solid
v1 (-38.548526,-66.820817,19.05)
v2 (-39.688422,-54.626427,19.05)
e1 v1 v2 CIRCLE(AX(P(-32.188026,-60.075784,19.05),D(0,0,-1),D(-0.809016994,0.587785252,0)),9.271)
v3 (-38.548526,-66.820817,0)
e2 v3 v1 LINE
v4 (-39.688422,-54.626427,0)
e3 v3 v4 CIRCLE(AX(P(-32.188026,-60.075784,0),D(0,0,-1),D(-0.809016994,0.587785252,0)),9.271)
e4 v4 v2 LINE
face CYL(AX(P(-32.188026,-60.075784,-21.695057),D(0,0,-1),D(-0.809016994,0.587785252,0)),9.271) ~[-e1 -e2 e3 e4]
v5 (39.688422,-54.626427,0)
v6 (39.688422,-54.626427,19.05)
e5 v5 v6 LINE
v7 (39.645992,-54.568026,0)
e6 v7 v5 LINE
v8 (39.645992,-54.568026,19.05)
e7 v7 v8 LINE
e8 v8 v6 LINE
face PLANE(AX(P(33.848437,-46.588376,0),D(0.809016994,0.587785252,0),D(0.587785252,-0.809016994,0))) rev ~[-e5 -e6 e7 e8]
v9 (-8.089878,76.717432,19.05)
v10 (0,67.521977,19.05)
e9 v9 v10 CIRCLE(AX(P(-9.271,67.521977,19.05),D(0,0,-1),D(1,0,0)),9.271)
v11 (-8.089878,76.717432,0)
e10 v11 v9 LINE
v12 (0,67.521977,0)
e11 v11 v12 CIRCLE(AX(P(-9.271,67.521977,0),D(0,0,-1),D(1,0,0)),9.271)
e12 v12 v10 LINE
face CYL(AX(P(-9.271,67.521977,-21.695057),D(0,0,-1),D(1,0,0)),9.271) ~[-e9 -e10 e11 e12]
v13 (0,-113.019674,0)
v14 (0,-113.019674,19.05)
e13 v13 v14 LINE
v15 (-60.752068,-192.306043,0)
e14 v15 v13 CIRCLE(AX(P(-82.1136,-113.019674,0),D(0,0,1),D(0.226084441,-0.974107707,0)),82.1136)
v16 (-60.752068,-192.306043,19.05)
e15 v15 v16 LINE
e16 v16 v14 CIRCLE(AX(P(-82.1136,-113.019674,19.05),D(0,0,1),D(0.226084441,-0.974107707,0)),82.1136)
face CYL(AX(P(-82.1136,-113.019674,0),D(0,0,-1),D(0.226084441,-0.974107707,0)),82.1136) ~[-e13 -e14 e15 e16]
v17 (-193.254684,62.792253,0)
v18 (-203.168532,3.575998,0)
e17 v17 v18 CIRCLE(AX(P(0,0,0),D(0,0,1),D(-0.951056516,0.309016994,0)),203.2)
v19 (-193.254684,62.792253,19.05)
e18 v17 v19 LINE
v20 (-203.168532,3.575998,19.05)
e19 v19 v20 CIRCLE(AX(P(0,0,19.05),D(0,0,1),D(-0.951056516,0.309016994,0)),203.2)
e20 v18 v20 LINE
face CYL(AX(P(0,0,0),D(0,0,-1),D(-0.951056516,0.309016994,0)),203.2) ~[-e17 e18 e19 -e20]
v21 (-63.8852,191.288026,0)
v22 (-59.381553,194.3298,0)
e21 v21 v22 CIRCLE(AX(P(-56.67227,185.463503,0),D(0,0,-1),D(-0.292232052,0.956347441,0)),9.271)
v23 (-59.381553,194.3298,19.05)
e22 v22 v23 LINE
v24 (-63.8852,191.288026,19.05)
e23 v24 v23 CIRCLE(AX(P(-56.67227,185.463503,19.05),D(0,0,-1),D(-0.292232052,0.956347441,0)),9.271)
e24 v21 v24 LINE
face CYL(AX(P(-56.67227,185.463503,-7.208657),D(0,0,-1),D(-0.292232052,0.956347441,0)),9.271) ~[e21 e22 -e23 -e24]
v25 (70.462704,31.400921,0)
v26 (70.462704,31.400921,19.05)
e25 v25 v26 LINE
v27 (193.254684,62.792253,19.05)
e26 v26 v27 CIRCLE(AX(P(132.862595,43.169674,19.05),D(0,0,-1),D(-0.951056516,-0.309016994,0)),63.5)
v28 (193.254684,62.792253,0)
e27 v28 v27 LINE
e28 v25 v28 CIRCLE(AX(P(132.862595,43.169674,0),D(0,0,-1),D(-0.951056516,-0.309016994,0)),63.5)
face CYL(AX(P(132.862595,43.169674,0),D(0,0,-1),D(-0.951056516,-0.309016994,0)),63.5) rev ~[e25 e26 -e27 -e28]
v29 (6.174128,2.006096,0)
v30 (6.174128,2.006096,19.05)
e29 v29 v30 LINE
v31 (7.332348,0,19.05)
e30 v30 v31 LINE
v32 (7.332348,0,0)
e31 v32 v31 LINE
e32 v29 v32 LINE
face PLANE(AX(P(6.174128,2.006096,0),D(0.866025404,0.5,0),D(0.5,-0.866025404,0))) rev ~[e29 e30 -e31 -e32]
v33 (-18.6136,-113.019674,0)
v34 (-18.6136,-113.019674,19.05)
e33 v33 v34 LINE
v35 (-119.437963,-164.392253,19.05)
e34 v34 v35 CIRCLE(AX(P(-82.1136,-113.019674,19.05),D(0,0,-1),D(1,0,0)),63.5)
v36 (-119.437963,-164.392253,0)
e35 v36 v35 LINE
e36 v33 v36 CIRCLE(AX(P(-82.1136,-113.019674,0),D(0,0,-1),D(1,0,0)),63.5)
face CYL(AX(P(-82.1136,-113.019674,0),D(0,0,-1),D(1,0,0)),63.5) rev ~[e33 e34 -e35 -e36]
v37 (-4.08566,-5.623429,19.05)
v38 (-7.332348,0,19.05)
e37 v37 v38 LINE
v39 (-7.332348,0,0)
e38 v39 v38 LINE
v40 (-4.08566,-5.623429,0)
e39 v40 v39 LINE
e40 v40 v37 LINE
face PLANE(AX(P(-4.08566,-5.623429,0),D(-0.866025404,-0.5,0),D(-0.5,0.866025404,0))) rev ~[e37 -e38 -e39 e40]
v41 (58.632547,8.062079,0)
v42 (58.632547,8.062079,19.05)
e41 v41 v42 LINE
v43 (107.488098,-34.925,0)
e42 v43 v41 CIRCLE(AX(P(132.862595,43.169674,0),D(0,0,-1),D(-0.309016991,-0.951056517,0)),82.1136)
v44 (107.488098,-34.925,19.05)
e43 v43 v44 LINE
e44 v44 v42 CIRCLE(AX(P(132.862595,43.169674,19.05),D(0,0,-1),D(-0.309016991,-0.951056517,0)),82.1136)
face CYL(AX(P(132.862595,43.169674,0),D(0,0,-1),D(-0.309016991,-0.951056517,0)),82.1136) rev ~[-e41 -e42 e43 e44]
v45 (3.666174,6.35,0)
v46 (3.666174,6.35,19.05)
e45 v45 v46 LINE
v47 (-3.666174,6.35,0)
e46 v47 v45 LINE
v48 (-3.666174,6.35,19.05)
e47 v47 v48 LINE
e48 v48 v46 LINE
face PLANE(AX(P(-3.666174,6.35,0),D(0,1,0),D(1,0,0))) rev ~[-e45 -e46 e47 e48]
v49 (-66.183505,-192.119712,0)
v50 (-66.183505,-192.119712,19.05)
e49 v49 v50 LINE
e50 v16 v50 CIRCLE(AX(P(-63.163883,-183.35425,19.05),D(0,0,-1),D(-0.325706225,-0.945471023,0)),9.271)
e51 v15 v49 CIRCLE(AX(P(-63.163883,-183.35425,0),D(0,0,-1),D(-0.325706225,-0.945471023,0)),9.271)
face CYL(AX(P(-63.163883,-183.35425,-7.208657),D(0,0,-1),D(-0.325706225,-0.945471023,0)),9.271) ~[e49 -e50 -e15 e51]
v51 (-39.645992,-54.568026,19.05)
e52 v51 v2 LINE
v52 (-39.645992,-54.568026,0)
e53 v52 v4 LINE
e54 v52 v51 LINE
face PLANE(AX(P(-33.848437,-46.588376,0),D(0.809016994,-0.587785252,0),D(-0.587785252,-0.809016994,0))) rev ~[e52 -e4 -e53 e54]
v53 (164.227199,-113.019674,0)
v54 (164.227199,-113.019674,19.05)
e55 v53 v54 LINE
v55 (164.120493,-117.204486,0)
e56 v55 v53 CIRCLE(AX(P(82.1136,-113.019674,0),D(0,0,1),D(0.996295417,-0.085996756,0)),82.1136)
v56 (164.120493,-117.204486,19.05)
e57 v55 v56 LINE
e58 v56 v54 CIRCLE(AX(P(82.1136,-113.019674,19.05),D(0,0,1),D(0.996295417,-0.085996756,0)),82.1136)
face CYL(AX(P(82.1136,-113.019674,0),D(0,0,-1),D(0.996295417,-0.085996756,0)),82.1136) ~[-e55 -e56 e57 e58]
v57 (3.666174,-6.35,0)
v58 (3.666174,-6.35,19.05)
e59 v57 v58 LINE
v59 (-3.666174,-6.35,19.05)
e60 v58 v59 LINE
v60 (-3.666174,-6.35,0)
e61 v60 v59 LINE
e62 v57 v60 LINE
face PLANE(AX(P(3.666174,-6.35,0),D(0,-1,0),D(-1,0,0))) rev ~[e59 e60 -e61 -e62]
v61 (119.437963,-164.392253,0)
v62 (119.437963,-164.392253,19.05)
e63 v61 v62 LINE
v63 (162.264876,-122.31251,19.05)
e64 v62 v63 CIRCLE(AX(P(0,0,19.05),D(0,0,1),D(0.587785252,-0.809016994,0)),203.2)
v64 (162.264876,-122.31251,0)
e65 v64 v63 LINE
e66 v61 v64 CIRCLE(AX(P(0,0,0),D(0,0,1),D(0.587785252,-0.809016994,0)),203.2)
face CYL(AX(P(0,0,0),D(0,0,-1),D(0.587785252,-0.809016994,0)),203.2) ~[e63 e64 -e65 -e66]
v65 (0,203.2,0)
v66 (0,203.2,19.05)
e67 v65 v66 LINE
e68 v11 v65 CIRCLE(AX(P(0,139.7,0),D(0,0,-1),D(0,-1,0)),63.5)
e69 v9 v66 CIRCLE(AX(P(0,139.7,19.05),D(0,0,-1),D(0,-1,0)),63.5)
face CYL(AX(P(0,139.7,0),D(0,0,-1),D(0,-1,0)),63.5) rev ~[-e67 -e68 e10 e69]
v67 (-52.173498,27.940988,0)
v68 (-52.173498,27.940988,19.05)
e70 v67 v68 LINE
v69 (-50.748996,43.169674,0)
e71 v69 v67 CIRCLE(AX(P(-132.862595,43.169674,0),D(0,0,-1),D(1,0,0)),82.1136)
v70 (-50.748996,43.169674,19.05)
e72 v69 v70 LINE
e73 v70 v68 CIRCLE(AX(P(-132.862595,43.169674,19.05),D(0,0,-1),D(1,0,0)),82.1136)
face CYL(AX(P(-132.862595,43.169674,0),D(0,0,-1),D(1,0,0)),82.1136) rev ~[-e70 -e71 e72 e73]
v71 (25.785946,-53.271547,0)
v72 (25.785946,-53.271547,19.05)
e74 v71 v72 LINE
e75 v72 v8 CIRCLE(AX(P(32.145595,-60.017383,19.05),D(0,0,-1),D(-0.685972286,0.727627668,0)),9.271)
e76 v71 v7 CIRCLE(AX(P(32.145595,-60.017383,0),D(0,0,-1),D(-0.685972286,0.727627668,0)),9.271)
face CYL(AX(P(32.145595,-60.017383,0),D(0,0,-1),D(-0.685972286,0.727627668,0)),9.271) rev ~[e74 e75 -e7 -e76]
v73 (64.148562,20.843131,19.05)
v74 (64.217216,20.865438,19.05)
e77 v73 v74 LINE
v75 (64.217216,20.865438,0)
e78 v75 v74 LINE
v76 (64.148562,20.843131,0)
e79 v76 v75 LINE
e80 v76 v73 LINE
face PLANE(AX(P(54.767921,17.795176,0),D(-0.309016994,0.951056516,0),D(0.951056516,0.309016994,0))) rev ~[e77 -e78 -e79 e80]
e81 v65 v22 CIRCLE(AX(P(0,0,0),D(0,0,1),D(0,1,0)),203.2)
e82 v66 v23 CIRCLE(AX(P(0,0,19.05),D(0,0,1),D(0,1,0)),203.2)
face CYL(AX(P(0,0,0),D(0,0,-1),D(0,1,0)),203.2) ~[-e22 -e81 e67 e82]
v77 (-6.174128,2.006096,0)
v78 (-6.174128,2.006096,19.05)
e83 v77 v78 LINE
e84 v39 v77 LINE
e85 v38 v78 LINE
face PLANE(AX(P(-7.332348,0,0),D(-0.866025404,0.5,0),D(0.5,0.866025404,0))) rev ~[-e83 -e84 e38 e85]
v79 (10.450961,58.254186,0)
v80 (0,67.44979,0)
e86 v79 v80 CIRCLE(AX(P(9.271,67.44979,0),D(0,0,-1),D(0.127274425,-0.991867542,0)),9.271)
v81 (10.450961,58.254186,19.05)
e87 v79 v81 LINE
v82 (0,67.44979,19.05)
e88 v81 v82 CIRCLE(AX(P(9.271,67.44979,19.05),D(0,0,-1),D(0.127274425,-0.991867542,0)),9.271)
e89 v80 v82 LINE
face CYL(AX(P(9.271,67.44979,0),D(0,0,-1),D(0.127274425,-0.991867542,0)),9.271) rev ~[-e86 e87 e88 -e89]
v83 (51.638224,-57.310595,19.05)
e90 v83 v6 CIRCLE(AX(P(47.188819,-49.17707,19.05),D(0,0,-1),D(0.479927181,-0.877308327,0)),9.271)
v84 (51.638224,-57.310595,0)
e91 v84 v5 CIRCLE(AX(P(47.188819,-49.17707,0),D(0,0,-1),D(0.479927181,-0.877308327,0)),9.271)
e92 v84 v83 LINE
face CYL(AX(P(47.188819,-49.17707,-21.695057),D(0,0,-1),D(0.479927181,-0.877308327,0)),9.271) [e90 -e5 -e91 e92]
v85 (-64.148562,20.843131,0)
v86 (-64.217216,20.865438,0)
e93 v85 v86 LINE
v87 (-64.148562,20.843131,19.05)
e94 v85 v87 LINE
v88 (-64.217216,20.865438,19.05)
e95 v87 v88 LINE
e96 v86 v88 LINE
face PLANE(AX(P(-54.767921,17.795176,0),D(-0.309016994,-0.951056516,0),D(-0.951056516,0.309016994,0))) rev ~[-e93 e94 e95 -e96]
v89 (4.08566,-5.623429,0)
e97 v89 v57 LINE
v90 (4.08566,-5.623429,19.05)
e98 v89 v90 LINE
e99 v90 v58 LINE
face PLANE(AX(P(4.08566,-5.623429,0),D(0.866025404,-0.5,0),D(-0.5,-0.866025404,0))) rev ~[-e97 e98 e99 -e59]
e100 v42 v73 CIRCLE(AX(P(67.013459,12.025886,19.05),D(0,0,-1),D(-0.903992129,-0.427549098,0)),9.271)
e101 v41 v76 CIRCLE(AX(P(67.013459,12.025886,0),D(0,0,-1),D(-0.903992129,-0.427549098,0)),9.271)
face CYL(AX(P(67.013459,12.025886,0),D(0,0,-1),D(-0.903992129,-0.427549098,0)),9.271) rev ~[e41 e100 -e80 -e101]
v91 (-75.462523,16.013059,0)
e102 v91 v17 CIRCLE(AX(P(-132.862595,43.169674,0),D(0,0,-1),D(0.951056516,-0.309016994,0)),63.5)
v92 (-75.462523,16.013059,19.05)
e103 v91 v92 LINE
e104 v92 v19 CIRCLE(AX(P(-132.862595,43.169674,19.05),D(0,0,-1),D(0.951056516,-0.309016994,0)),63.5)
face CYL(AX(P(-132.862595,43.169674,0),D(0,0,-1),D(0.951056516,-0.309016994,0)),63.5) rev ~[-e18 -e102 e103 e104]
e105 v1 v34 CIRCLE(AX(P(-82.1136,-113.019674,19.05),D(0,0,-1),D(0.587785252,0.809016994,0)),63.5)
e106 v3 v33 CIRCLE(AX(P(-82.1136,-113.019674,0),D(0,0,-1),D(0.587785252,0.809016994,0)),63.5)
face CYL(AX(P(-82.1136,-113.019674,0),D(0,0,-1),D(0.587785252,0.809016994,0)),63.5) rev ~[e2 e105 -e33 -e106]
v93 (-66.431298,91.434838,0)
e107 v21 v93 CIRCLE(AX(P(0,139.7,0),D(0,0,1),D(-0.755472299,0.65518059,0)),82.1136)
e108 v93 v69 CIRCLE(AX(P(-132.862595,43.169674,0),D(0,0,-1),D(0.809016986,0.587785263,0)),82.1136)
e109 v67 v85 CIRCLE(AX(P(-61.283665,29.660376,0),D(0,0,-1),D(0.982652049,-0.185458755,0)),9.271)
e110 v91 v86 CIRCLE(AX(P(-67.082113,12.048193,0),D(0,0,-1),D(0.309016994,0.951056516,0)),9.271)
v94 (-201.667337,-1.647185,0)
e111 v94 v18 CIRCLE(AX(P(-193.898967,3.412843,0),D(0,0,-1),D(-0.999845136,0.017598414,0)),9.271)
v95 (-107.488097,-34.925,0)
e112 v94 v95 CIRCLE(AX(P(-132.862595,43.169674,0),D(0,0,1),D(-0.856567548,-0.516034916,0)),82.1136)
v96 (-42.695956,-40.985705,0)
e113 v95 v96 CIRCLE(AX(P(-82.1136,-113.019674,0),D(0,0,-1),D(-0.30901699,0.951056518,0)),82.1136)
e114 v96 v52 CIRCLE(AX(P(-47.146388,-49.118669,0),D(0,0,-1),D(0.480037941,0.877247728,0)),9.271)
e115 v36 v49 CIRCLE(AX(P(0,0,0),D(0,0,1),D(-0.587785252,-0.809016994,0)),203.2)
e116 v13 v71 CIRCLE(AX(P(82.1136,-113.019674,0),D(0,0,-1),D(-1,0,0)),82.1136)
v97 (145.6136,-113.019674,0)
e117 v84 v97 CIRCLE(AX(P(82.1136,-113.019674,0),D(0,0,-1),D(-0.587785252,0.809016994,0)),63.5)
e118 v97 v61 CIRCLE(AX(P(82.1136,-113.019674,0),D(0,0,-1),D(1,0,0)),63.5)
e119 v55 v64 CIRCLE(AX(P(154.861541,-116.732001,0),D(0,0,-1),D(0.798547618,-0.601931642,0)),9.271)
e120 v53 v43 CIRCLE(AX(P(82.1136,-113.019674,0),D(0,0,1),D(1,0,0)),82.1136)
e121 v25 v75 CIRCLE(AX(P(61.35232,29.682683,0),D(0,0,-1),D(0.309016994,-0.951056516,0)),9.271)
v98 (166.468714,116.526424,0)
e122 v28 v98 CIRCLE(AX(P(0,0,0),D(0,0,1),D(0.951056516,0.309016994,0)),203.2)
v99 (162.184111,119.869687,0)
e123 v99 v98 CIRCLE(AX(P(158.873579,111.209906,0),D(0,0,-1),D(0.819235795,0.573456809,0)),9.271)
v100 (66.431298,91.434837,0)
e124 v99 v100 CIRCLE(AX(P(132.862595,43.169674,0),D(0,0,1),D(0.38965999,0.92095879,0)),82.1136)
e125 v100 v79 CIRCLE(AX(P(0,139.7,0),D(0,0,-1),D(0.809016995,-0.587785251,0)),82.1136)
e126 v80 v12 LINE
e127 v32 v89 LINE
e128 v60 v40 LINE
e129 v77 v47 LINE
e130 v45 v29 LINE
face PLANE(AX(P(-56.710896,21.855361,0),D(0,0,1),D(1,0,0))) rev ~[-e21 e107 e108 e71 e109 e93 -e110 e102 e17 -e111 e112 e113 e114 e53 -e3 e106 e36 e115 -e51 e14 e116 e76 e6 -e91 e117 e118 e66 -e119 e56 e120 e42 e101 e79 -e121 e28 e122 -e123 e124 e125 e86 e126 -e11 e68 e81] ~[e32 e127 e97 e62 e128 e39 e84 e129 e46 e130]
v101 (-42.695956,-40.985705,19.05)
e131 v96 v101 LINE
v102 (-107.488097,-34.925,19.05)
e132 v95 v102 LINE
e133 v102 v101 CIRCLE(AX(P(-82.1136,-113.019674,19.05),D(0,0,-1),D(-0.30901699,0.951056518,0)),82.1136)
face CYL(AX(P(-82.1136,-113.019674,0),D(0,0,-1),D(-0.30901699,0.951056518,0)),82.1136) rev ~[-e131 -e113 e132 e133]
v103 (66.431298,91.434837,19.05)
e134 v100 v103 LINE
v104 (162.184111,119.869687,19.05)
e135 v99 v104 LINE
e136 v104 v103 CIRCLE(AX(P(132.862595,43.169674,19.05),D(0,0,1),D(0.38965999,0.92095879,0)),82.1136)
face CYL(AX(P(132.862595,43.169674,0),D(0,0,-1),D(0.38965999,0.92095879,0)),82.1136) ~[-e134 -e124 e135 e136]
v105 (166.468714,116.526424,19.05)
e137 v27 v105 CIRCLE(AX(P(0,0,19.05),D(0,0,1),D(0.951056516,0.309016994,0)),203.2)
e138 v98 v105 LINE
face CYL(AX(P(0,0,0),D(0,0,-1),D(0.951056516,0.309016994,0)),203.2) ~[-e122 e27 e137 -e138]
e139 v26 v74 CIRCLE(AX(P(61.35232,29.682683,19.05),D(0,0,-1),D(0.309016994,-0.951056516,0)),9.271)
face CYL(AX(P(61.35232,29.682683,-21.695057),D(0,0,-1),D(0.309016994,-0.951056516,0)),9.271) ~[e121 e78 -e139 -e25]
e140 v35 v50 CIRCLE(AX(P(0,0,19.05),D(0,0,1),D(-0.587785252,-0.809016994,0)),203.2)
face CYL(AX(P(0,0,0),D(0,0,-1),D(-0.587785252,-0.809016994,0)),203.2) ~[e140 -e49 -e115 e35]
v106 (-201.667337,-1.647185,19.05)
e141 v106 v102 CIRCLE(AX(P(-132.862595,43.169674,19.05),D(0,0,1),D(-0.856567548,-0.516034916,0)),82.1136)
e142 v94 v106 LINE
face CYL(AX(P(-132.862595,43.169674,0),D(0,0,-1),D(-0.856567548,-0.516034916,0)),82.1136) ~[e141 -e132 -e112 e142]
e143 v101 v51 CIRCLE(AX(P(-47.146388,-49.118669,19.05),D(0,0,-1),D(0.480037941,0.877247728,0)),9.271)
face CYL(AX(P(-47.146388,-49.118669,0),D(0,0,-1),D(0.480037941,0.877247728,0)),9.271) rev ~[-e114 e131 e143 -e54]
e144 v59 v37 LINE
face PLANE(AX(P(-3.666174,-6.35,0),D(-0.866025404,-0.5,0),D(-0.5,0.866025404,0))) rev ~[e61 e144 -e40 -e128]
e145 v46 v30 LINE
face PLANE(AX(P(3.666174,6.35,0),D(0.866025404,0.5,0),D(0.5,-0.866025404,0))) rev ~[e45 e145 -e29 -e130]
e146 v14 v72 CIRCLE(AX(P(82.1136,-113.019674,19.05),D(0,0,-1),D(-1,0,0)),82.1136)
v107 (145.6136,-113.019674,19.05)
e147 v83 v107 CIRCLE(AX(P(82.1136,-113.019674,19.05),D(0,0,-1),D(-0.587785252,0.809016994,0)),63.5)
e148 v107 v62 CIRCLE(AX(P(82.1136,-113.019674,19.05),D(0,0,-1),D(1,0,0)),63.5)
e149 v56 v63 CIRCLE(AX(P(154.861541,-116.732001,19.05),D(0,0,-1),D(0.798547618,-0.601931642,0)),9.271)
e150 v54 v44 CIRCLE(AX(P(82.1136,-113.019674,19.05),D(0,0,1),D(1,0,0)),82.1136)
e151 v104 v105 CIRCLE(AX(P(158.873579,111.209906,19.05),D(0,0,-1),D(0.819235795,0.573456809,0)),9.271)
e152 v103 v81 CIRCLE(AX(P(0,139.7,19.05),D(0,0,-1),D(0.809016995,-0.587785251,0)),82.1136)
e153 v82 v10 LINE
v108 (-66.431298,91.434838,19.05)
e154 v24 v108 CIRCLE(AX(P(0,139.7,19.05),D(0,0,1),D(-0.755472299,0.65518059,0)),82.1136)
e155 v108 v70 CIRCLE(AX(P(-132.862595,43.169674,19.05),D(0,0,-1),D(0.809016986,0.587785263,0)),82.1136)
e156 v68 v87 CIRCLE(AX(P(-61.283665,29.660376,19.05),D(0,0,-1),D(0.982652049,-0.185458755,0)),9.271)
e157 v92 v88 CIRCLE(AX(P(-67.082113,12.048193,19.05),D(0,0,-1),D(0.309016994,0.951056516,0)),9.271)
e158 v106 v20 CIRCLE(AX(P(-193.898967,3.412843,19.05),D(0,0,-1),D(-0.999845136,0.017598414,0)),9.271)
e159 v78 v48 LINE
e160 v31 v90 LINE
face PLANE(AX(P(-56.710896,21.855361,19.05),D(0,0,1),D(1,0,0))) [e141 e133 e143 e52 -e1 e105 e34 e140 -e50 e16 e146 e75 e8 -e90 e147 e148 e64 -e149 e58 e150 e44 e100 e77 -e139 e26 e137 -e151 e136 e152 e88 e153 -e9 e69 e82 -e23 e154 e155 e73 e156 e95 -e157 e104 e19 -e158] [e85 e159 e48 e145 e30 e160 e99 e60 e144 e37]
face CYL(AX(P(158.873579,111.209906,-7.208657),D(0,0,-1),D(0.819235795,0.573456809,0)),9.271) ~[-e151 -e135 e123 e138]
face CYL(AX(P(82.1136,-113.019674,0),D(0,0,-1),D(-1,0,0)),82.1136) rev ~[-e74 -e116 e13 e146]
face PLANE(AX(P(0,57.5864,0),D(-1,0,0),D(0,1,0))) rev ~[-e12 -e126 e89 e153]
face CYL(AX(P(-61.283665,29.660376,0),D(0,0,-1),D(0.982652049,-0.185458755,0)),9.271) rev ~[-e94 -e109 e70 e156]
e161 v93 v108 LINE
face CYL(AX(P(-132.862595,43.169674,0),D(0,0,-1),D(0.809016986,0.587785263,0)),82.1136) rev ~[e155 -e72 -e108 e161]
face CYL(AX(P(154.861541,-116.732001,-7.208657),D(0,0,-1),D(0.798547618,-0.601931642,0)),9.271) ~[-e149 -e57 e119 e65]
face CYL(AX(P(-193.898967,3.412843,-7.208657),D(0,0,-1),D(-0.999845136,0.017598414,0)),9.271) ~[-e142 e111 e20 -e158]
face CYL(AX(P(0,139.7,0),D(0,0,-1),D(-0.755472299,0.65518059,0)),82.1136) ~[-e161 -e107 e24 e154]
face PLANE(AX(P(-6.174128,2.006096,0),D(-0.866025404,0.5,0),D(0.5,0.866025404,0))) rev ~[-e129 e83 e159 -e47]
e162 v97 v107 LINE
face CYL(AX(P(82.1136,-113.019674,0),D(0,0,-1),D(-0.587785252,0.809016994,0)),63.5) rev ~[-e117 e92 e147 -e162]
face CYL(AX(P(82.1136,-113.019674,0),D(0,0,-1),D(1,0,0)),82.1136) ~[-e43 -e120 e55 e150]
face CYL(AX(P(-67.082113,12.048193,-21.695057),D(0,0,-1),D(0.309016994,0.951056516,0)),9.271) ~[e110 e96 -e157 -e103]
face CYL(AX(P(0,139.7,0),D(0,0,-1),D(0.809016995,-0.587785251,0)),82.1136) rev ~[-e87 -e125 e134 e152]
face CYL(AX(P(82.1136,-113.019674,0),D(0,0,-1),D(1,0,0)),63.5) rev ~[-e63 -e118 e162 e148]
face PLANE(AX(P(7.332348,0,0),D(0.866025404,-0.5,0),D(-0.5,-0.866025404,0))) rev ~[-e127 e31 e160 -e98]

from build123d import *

# Parameters (mm, degrees)
F1_DEPTH    = 19.05
F2_T1_DEPTH = 19.05
F2_T3_DEPTH = 33.4673134048
F2_T5_DEPTH = 62.4401148549


# Not quite as in the source:
# - a fillet or chamfer that OpenCascade refuses, or shapes differently, is made with other operations: its cross-section is extruded or revolved along the edge and cut away or added


with BuildPart() as f1:
    # F0 (on Top) → F1 (new body)
    with BuildSketch(Plane.XY):
        with BuildLine():
            ThreePointArc((119.4379632658, -164.392253257), (143.4023261419, -143.965318244), (163.9230028488, -120.0811772803))
            ThreePointArc((163.9230028488, -120.0811772803), (164.1511150811, -116.5537002375), (164.2271994905, -113.0196741142))
            ThreePointArc((164.2271994905, -113.0196741142), (148.5448974992, -64.7545112961), (107.4880978294, -34.9250000954))
            ThreePointArc((107.4880978294, -34.9250000954), (69.268202849, -31.9170290174), (33.8484368023, -46.588376451))
            Line((33.8484368023, -46.588376451), (44.7892362247, -61.6470949714))
            ThreePointArc((44.7892362247, -61.6470949714), (110.9419964787, -56.4407598282), (145.6135997453, -113.0196741142))
            ThreePointArc((145.6135997453, -113.0196741142), (138.6925140312, -141.8480708476), (119.4379632658, -164.392253257))
        make_face()
        with BuildLine():
            ThreePointArc((72.4705065417, 23.5470949714), (113.2400161836, 103.5617628989), (193.2546841112, 62.792253257))
            ThreePointArc((193.2546841112, 62.792253257), (181.2329098472, 91.8959867911), (164.8589797861, 118.7929155459))
            ThreePointArc((164.8589797861, 118.7929155459), (110.8726675576, 122.284061806), (66.4312977521, 91.4348371795))
            ThreePointArc((66.4312977521, 91.4348371795), (51.7599502656, 56.0150712376), (54.7679212123, 17.7951763236))
            Line((54.7679212123, 17.7951763236), (72.4705065417, 23.5470949714))
        make_face()
        with BuildLine():
            ThreePointArc((33.8484368023, -46.588376451), (69.268202849, -31.9170290174), (107.4880978294, -34.9250000954))
            ThreePointArc((107.4880978294, -34.9250000954), (74.799512228, -14.8934092025), (54.7679212123, 17.7951763236))
            Line((54.7679212123, 17.7951763236), (6.1741283973, 2.0060959234))
            Line((6.1741283973, 2.0060959234), (7.3323484187, 0))
            Line((7.3323484187, 0), (4.0856602382, -5.623428885))
            Line((4.0856602382, -5.623428885), (33.8484368023, -46.588376451))
        make_face()
        with BuildLine():
            ThreePointArc((0, -113.0196741142), (8.9498466476, -75.7408799304), (33.8484368023, -46.588376451))
            Line((33.8484368023, -46.588376451), (4.0856602382, -5.623428885))
            Line((4.0856602382, -5.623428885), (3.6661742094, -6.35))
            Line((3.6661742094, -6.35), (-3.6661742094, -6.35))
            Line((-3.6661742094, -6.35), (-4.0856602382, -5.623428885))
            Line((-4.0856602382, -5.623428885), (-33.8484368023, -46.588376451))
            ThreePointArc((-33.8484368023, -46.588376451), (-8.9498466476, -75.7408799304), (0, -113.0196741142))
        make_face()
        with BuildLine():
            Line((6.1741283973, 2.0060959234), (54.7679212123, 17.7951763236))
            ThreePointArc((54.7679212123, 17.7951763236), (51.7599502656, 56.0150712376), (66.4312977521, 91.4348371795))
            ThreePointArc((66.4312977521, 91.4348371795), (37.2787942512, 66.5362469367), (0, 57.5864002547))
            Line((0, 57.5864002547), (0, 6.35))
            Line((0, 6.35), (3.6661742094, 6.35))
            Line((3.6661742094, 6.35), (6.1741283973, 2.0060959234))
        make_face()
        with BuildLine():
            ThreePointArc((-119.4379632658, -164.392253257), (-92.6053982257, -180.8714466671), (-63.5489924876, -193.0071645142))
            ThreePointArc((-63.5489924876, -193.0071645142), (-17.8211040988, -164.0992029557), (0, -113.0196741142))
            ThreePointArc((0, -113.0196741142), (-8.9498466476, -75.7408799304), (-33.8484368023, -46.588376451))
            Line((-33.8484368023, -46.588376451), (-44.7892362247, -61.6470949714))
            ThreePointArc((-44.7892362247, -61.6470949714), (-25.5346854593, -84.1912773807), (-18.6135997453, -113.0196741142))
            ThreePointArc((-18.6135997453, -113.0196741142), (-53.2852030118, -169.5985884001), (-119.4379632658, -164.392253257))
        make_face()
        with BuildLine():
            ThreePointArc((-107.4880971788, -34.924999884), (-69.2682025112, -31.9170290709), (-33.8484368023, -46.588376451))
            Line((-33.8484368023, -46.588376451), (-4.0856602382, -5.623428885))
            Line((-4.0856602382, -5.623428885), (-7.3323484187, 0))
            Line((-7.3323484187, 0), (-6.1741283973, 2.0060959234))
            Line((-6.1741283973, 2.0060959234), (-54.7679212123, 17.7951763236))
            ThreePointArc((-54.7679212123, 17.7951763236), (-74.7995119862, -14.8934089606), (-107.4880971788, -34.924999884))
        make_face()
        with BuildLine():
            ThreePointArc((0, 76.2), (-63.5, 139.7), (0, 203.2))
            ThreePointArc((0, 203.2), (-31.3942279763, 200.7601615106), (-62.0345499904, 193.4992367104))
            ThreePointArc((-62.0345499904, 193.4992367104), (-82.037515312, 143.2340266773), (-66.431298315, 91.4348379542))
            ThreePointArc((-66.431298315, 91.4348379542), (-37.2787946778, 66.5362471541), (0, 57.5864002547))
            Line((0, 57.5864002547), (0, 76.2))
        make_face()
        with BuildLine():
            Line((0, 6.35), (0, 57.5864002547))
            ThreePointArc((0, 57.5864002547), (-37.2787946778, 66.5362471541), (-66.431298315, 91.4348379542))
            ThreePointArc((-66.431298315, 91.4348379542), (-54.7679213836, 68.5441724321), (-50.7489955812, 43.1696741142))
            ThreePointArc((-50.7489955812, 43.1696741142), (-51.7599502537, 30.3242770655), (-54.7679212123, 17.7951763236))
            Line((-54.7679212123, 17.7951763236), (-6.1741283973, 2.0060959234))
            Line((-6.1741283973, 2.0060959234), (-3.6661742094, 6.35))
            Line((-3.6661742094, 6.35), (0, 6.35))
        make_face()
        with BuildLine():
            ThreePointArc((-193.2546841112, 62.792253257), (-200.6356097871, 32.1806166093), (-203.198440157, 0.7961895383))
            ThreePointArc((-203.198440157, 0.7961895383), (-161.574640139, -33.7605653616), (-107.4880971788, -34.924999884))
            ThreePointArc((-107.4880971788, -34.924999884), (-74.7995119862, -14.8934089606), (-54.7679212123, 17.7951763236))
            Line((-54.7679212123, 17.7951763236), (-72.4705065417, 23.5470949714))
            ThreePointArc((-72.4705065417, 23.5470949714), (-152.4851744692, -17.2224146706), (-193.2546841112, 62.792253257))
        make_face()
    extrude(amount=F1_DEPTH)

    # F2: fillet of radius 9.271 on 18 edges, made by hand

    # F2_s2 → F2_t1 (join)
    with BuildSketch(Plane.XY):
        with BuildLine():
            ThreePointArc((-52.1734982583, 27.9409881084), (-56.556536878, 21.6850582504), (-64.1485619626, 20.8431312667))
            Line((-64.1485619626, 20.8431312667), (-54.7679212123, 17.7951763236))
            ThreePointArc((-54.7679212123, 17.7951763236), (-53.3088030101, 22.8266804501), (-52.1734982583, 27.9409881084))
        make_face()
        with BuildLine():
            ThreePointArc((10.4509611944, 58.2541856616), (3.146784917, 60.4895144603), (0, 67.4497896429))
            Line((0, 67.4497896429), (0, 57.5864002547))
            ThreePointArc((0, 57.5864002547), (5.2361371076, 57.7535166629), (10.4509611944, 58.2541856616))
        make_face()
        with BuildLine():
            ThreePointArc((58.6325474916, 8.0620786174), (58.501356912, 15.6995176491), (64.1485619626, 20.8431312667))
            Line((64.1485619626, 20.8431312667), (54.7679212123, 17.7951763236))
            ThreePointArc((54.7679212123, 17.7951763236), (56.5449137123, 12.8669558174), (58.6325474916, 8.0620786174))
        make_face()
        with BuildLine():
            ThreePointArc((25.7859460024, -53.2715470561), (33.0090420427, -50.7866789462), (39.6459916223, -54.5680260881))
            Line((39.6459916223, -54.5680260881), (33.8484368023, -46.588376451))
            ThreePointArc((33.8484368023, -46.588376451), (29.7105414576, -49.801300636), (25.7859460024, -53.2715470561))
        make_face()
        with BuildLine():
            ThreePointArc((-42.6959564301, -40.9857053314), (-38.1006469936, -47.0874114136), (-39.6459916223, -54.5680260881))
            Line((-39.6459916223, -54.5680260881), (-33.8484368023, -46.588376451))
            ThreePointArc((-33.8484368023, -46.588376451), (-38.1827892674, -43.6458522944), (-42.6959564301, -40.9857053314))
        make_face()
    extrude(amount=F2_T1_DEPTH)

    # F2_s4 → F2_t3 (cut)
    with BuildSketch(Plane.XY.offset(-7.2086567024)):
        with BuildLine():
            ThreePointArc((-66.1835050247, -192.1197118014), (-63.4817465047, -192.6197992349), (-60.7520682549, -192.3060426495))
            ThreePointArc((-60.7520682549, -192.3060426495), (-62.1474526007, -192.6688814632), (-63.5489924876, -193.0071645142))
            ThreePointArc((-63.5489924876, -193.0071645142), (-64.8677664235, -192.56794354), (-66.1835050247, -192.1197118014))
        make_face()
        with BuildLine():
            ThreePointArc((162.2648760175, -122.3125096261), (163.5753767273, -119.8975200957), (164.1204934505, -117.2044856919))
            ThreePointArc((164.1204934505, -117.2044856919), (164.0343761921, -118.6436984264), (163.9230028488, -120.0811772803))
            ThreePointArc((163.9230028488, -120.0811772803), (163.0977553213, -121.1996790803), (162.2648760175, -122.3125096261))
        make_face()
        with BuildLine():
            ThreePointArc((166.4687135838, 116.5264236032), (164.5768890447, 118.5190566489), (162.1841114577, 119.8696868579))
            ThreePointArc((162.1841114577, 119.8696868579), (163.5262724108, 119.3430432847), (164.8589797861, 118.7929155459))
            ThreePointArc((164.8589797861, 118.7929155459), (165.6677227009, 117.6624224428), (166.4687135838, 116.5264236032))
        make_face()
        with BuildLine():
            ThreePointArc((-59.3815529592, 194.3298000003), (-61.8612655349, 193.1463254193), (-63.8852001344, 191.2880263909))
            ThreePointArc((-63.8852001344, 191.2880263909), (-62.9695817887, 192.4017554972), (-62.0345499904, 193.4992367104))
            ThreePointArc((-62.0345499904, 193.4992367104), (-60.7094718533, 193.9190553486), (-59.3815529592, 194.3298000003))
        make_face()
        with BuildLine():
            ThreePointArc((-203.1685316174, 3.575997824), (-202.8092537324, 0.8519372624), (-201.6673365189, -1.6471849074))
            ThreePointArc((-201.6673365189, -1.6471849074), (-202.4436142136, -0.4322188923), (-203.198440157, 0.7961895383))
            ThreePointArc((-203.198440157, 0.7961895383), (-203.1882397453, 2.1861448289), (-203.1685316174, 3.575997824))
        make_face()
    extrude(amount=F2_T3_DEPTH, mode=Mode.SUBTRACT)

    # F2_s6 → F2_t5 (cut)
    with BuildSketch(Plane.XY.offset(-21.6950574275)):
        with BuildLine():
            ThreePointArc((51.638223753, -57.3105953376), (45.1569902325, -58.2226827749), (39.6884223033, -54.6264269103))
            Line((39.6884223033, -54.6264269103), (44.7892362247, -61.6470949714))
            ThreePointArc((44.7892362247, -61.6470949714), (48.14445968, -59.3694409066), (51.638223753, -57.3105953376))
        make_face()
        with BuildLine():
            ThreePointArc((64.2172162466, 20.8654383958), (69.3273392459, 24.9550513813), (70.4627038476, 31.4009212731))
            ThreePointArc((70.4627038476, 31.4009212731), (71.3411498691, 27.4419359155), (72.4705065417, 23.5470949714))
            Line((72.4705065417, 23.5470949714), (64.2172162466, 20.8654383958))
        make_face()
        with BuildLine():
            ThreePointArc((0, 67.521977029), (-2.3103382289, 73.6457527196), (-8.089877836, 76.7174319625))
            ThreePointArc((-8.089877836, 76.7174319625), (-4.0532042644, 76.3294900195), (0, 76.2))
            Line((0, 76.2), (0, 67.521977029))
        make_face()
        with BuildLine():
            ThreePointArc((-64.2172162466, 20.8654383958), (-70.7552067969, 20.5605269264), (-75.4625233151, 16.0130592093))
            ThreePointArc((-75.4625233151, 16.0130592093), (-73.8461678679, 19.7322832604), (-72.4705065417, 23.5470949714))
            Line((-72.4705065417, 23.5470949714), (-64.2172162466, 20.8654383958))
        make_face()
        with BuildLine():
            ThreePointArc((-39.6884223033, -54.6264269103), (-41.4187844526, -60.9386482525), (-38.5485264496, -66.8208171073))
            ThreePointArc((-38.5485264496, -66.8208171073), (-41.5862374169, -64.1342682889), (-44.7892362247, -61.6470949714))
            Line((-44.7892362247, -61.6470949714), (-39.6884223033, -54.6264269103))
        make_face()
    extrude(amount=F2_T5_DEPTH, mode=Mode.SUBTRACT)


solid = f1.part
